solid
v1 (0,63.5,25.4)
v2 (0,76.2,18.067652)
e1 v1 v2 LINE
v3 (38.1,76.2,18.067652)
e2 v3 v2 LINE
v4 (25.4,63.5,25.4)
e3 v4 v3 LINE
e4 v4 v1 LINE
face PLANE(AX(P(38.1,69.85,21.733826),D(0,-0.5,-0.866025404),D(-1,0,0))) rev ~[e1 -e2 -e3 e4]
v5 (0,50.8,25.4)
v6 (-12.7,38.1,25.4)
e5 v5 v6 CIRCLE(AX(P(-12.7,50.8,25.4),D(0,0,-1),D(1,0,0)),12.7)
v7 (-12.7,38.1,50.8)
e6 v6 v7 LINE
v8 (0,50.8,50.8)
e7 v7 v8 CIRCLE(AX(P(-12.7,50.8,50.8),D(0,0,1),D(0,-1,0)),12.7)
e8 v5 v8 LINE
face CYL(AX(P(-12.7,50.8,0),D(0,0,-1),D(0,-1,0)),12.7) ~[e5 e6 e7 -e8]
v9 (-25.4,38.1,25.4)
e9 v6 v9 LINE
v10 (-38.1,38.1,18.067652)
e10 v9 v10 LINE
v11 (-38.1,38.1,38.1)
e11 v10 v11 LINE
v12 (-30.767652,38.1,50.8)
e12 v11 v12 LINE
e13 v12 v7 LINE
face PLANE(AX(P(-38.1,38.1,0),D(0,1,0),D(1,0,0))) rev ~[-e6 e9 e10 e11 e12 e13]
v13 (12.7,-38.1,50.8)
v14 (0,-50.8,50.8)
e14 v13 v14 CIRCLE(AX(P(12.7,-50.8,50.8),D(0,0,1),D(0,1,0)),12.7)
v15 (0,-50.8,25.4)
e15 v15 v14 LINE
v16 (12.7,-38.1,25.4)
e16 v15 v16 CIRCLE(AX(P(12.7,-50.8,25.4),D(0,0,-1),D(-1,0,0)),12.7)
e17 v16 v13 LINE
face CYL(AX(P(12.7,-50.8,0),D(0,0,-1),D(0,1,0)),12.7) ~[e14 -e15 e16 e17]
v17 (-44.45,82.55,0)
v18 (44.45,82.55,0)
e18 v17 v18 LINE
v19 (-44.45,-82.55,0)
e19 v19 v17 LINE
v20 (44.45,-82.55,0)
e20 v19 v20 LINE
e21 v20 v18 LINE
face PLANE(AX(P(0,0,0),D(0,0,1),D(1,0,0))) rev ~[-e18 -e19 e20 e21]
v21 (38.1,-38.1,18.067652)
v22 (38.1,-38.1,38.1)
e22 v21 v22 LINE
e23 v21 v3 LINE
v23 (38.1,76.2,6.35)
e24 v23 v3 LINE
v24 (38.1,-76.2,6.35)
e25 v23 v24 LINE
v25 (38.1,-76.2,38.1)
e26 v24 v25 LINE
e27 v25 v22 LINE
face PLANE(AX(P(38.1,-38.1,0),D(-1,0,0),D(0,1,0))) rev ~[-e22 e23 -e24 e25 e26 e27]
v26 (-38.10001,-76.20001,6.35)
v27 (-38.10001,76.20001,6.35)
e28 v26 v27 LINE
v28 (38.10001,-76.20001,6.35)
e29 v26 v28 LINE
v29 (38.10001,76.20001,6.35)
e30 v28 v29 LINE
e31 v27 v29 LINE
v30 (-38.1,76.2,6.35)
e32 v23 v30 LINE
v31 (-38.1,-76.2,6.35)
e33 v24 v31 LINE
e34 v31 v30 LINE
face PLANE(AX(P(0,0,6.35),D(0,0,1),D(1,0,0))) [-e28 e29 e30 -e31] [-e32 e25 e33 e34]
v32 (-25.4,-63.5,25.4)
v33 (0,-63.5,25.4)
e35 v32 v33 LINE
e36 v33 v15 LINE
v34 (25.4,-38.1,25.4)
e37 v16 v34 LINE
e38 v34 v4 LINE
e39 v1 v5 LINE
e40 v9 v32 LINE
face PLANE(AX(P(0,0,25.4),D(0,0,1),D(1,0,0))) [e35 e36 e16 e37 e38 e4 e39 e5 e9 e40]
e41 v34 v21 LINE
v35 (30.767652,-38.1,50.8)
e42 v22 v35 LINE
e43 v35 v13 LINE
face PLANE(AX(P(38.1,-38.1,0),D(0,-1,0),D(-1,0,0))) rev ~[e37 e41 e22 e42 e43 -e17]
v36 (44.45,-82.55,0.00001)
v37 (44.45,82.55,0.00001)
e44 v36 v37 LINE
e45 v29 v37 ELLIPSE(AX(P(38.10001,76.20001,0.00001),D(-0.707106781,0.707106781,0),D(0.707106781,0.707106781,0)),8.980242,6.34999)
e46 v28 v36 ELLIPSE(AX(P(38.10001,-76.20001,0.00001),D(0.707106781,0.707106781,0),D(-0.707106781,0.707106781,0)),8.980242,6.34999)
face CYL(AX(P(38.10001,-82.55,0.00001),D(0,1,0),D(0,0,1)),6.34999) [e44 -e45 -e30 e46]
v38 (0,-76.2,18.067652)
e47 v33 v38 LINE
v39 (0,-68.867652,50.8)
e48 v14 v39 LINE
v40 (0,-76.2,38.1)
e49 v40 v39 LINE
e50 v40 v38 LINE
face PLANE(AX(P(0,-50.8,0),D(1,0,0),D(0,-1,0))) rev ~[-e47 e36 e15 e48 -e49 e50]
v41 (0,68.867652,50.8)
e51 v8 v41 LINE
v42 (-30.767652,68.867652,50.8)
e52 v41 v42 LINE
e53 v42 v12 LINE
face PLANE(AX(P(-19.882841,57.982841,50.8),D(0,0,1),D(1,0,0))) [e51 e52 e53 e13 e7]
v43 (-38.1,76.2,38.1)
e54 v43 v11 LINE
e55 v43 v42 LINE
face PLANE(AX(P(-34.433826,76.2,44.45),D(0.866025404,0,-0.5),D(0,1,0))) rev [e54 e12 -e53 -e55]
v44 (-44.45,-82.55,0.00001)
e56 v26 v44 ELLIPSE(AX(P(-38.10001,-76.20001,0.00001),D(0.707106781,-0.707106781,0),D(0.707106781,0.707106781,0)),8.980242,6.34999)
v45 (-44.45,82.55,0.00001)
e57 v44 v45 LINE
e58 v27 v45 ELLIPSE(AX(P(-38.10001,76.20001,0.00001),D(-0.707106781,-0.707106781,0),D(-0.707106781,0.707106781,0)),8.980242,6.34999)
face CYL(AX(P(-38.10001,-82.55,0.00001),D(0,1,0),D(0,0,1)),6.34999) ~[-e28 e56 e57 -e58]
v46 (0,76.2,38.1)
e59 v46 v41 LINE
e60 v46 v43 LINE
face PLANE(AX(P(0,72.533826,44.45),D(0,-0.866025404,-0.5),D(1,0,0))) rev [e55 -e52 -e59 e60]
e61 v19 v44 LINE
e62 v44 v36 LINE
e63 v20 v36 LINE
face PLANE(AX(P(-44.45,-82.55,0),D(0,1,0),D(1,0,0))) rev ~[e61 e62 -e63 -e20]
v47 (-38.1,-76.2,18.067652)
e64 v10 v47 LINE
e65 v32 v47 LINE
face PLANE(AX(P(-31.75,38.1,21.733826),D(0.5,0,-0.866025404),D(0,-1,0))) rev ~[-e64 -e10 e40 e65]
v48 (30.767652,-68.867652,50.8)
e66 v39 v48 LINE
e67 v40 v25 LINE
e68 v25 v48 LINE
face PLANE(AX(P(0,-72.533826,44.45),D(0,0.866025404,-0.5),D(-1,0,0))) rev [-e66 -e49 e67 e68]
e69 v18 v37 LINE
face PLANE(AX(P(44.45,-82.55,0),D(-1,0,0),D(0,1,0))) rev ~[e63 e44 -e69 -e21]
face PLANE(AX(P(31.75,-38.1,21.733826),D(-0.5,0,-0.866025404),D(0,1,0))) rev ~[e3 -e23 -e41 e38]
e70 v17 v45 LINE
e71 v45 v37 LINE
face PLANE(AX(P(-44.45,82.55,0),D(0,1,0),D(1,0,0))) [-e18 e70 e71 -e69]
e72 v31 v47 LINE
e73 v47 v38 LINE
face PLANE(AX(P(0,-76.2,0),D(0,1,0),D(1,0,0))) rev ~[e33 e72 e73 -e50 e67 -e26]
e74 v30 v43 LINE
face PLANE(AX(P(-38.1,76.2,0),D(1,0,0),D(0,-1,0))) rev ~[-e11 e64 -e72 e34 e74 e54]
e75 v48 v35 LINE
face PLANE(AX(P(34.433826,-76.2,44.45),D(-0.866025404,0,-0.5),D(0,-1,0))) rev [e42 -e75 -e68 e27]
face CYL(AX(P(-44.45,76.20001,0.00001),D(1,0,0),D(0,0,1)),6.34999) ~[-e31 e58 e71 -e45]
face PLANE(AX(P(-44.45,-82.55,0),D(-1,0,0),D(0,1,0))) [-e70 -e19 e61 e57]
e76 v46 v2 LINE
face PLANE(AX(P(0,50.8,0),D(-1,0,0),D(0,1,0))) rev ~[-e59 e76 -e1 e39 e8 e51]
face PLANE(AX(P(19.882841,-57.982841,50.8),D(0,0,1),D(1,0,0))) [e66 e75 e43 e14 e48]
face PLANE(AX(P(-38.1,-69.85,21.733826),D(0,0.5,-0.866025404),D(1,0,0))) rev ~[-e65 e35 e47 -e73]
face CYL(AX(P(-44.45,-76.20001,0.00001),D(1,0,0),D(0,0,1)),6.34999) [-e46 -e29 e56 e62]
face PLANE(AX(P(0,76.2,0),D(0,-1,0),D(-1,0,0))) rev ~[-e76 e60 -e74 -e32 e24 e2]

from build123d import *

# Parameters (mm, degrees)
F0_W     = 88.9
F0_H     = 165.1
F1_DEPTH = 6.35
F2_DEPTH = 25.4
F3_DEPTH = 50.8
F4_SIZE2 = 7.3323484187
F4_SIZE  = 12.7
F5_R     = 6.34999
F6_SIZE2 = 7.3323484187
F6_SIZE  = 12.7
F7_SIZE2 = 7.3323484187
F7_SIZE  = 12.7


# Not quite as in the source:
# - a fillet or chamfer is up to 0.001 mm smaller than in the source, because OpenCascade refuses the exact size


with BuildPart() as f1:
    # F0 (on Top) → F1 (new body)
    with BuildSketch(Plane.XY):
        Rectangle(F0_W, F0_H)
        Polygon((-38.1, 38.1), (-38.1, 76.2), (0, 76.2), (38.1, 76.2), (38.1, -38.1), (38.1, -76.2), (0, -76.2), (-38.1, -76.2), align=None, mode=Mode.SUBTRACT)
    extrude(amount=F1_DEPTH)

    # F0 (on Top) → F2 (join)
    with BuildSketch(Plane.XY):
        with BuildLine():
            Line((38.1, 76.2), (0, 76.2))
            Line((0, 76.2), (0, 50.8))
            ThreePointArc((0, 50.8), (-3.7197438789, 41.8197438789), (-12.7, 38.1))
            Line((-12.7, 38.1), (-38.1, 38.1))
            Line((-38.1, 38.1), (-38.1, -76.2))
            Line((-38.1, -76.2), (0, -76.2))
            Line((0, -76.2), (0, -50.8))
            ThreePointArc((0, -50.8), (3.7197438789, -41.8197438789), (12.7, -38.1))
            Line((12.7, -38.1), (38.1, -38.1))
            Line((38.1, -38.1), (38.1, 76.2))
        make_face()
    extrude(amount=F2_DEPTH)

    # F0 (on Top) → F3 (join)
    with BuildSketch(Plane.XY):
        with BuildLine():
            Line((0, 76.2), (-38.1, 76.2))
            Line((-38.1, 76.2), (-38.1, 38.1))
            Line((-38.1, 38.1), (-12.7, 38.1))
            ThreePointArc((-12.7, 38.1), (-3.7197438789, 41.8197438789), (0, 50.8))
            Line((0, 50.8), (0, 76.2))
        make_face()
        with BuildLine():
            Line((38.1, -76.2), (38.1, -38.1))
            Line((38.1, -38.1), (12.7, -38.1))
            ThreePointArc((12.7, -38.1), (3.7197438789, -41.8197438789), (0, -50.8))
            Line((0, -50.8), (0, -76.2))
            Line((0, -76.2), (38.1, -76.2))
        make_face()
    extrude(amount=F3_DEPTH)

    # F4
    f4_edges = [f1.edges().sort_by_distance(p)[0] for p in [
        (-38.1, -19.05, 25.4),
        (-19.05, -76.2, 25.4),
        (38.1, 19.05, 25.4),
        (19.05, 76.2, 25.4),
    ]]
    f4_side = f1.faces().sort_by_distance((0, 0, 25.4))[0]
    chamfer(f4_edges, length=F4_SIZE, length2=F4_SIZE2, reference=f4_side)

    # F5 (radius 6.35 in the source; OpenCascade refuses exactly that, so slightly less here)
    f5_edges = [f1.edges().sort_by_distance(p)[0] for p in [
        (44.45, 0, 6.35),
        (0, -82.55, 6.35),
        (-44.45, 0, 6.35),
        (0, 82.55, 6.35),
    ]]
    fillet(f5_edges, radius=F5_R)

    # F6
    f6_edges = [f1.edges().sort_by_distance(p)[0] for p in [
        (-19.05, 76.2, 50.8),
        (-38.1, 57.15, 50.8),
    ]]
    chamfer(f6_edges, length=F6_SIZE, length2=F6_SIZE2)

    # F7
    f7_edges = [f1.edges().sort_by_distance(p)[0] for p in [
        (38.1, -57.15, 50.8),
        (19.05, -76.2, 50.8),
    ]]
    chamfer(f7_edges, length=F7_SIZE, length2=F7_SIZE2)


solid = f1.part
